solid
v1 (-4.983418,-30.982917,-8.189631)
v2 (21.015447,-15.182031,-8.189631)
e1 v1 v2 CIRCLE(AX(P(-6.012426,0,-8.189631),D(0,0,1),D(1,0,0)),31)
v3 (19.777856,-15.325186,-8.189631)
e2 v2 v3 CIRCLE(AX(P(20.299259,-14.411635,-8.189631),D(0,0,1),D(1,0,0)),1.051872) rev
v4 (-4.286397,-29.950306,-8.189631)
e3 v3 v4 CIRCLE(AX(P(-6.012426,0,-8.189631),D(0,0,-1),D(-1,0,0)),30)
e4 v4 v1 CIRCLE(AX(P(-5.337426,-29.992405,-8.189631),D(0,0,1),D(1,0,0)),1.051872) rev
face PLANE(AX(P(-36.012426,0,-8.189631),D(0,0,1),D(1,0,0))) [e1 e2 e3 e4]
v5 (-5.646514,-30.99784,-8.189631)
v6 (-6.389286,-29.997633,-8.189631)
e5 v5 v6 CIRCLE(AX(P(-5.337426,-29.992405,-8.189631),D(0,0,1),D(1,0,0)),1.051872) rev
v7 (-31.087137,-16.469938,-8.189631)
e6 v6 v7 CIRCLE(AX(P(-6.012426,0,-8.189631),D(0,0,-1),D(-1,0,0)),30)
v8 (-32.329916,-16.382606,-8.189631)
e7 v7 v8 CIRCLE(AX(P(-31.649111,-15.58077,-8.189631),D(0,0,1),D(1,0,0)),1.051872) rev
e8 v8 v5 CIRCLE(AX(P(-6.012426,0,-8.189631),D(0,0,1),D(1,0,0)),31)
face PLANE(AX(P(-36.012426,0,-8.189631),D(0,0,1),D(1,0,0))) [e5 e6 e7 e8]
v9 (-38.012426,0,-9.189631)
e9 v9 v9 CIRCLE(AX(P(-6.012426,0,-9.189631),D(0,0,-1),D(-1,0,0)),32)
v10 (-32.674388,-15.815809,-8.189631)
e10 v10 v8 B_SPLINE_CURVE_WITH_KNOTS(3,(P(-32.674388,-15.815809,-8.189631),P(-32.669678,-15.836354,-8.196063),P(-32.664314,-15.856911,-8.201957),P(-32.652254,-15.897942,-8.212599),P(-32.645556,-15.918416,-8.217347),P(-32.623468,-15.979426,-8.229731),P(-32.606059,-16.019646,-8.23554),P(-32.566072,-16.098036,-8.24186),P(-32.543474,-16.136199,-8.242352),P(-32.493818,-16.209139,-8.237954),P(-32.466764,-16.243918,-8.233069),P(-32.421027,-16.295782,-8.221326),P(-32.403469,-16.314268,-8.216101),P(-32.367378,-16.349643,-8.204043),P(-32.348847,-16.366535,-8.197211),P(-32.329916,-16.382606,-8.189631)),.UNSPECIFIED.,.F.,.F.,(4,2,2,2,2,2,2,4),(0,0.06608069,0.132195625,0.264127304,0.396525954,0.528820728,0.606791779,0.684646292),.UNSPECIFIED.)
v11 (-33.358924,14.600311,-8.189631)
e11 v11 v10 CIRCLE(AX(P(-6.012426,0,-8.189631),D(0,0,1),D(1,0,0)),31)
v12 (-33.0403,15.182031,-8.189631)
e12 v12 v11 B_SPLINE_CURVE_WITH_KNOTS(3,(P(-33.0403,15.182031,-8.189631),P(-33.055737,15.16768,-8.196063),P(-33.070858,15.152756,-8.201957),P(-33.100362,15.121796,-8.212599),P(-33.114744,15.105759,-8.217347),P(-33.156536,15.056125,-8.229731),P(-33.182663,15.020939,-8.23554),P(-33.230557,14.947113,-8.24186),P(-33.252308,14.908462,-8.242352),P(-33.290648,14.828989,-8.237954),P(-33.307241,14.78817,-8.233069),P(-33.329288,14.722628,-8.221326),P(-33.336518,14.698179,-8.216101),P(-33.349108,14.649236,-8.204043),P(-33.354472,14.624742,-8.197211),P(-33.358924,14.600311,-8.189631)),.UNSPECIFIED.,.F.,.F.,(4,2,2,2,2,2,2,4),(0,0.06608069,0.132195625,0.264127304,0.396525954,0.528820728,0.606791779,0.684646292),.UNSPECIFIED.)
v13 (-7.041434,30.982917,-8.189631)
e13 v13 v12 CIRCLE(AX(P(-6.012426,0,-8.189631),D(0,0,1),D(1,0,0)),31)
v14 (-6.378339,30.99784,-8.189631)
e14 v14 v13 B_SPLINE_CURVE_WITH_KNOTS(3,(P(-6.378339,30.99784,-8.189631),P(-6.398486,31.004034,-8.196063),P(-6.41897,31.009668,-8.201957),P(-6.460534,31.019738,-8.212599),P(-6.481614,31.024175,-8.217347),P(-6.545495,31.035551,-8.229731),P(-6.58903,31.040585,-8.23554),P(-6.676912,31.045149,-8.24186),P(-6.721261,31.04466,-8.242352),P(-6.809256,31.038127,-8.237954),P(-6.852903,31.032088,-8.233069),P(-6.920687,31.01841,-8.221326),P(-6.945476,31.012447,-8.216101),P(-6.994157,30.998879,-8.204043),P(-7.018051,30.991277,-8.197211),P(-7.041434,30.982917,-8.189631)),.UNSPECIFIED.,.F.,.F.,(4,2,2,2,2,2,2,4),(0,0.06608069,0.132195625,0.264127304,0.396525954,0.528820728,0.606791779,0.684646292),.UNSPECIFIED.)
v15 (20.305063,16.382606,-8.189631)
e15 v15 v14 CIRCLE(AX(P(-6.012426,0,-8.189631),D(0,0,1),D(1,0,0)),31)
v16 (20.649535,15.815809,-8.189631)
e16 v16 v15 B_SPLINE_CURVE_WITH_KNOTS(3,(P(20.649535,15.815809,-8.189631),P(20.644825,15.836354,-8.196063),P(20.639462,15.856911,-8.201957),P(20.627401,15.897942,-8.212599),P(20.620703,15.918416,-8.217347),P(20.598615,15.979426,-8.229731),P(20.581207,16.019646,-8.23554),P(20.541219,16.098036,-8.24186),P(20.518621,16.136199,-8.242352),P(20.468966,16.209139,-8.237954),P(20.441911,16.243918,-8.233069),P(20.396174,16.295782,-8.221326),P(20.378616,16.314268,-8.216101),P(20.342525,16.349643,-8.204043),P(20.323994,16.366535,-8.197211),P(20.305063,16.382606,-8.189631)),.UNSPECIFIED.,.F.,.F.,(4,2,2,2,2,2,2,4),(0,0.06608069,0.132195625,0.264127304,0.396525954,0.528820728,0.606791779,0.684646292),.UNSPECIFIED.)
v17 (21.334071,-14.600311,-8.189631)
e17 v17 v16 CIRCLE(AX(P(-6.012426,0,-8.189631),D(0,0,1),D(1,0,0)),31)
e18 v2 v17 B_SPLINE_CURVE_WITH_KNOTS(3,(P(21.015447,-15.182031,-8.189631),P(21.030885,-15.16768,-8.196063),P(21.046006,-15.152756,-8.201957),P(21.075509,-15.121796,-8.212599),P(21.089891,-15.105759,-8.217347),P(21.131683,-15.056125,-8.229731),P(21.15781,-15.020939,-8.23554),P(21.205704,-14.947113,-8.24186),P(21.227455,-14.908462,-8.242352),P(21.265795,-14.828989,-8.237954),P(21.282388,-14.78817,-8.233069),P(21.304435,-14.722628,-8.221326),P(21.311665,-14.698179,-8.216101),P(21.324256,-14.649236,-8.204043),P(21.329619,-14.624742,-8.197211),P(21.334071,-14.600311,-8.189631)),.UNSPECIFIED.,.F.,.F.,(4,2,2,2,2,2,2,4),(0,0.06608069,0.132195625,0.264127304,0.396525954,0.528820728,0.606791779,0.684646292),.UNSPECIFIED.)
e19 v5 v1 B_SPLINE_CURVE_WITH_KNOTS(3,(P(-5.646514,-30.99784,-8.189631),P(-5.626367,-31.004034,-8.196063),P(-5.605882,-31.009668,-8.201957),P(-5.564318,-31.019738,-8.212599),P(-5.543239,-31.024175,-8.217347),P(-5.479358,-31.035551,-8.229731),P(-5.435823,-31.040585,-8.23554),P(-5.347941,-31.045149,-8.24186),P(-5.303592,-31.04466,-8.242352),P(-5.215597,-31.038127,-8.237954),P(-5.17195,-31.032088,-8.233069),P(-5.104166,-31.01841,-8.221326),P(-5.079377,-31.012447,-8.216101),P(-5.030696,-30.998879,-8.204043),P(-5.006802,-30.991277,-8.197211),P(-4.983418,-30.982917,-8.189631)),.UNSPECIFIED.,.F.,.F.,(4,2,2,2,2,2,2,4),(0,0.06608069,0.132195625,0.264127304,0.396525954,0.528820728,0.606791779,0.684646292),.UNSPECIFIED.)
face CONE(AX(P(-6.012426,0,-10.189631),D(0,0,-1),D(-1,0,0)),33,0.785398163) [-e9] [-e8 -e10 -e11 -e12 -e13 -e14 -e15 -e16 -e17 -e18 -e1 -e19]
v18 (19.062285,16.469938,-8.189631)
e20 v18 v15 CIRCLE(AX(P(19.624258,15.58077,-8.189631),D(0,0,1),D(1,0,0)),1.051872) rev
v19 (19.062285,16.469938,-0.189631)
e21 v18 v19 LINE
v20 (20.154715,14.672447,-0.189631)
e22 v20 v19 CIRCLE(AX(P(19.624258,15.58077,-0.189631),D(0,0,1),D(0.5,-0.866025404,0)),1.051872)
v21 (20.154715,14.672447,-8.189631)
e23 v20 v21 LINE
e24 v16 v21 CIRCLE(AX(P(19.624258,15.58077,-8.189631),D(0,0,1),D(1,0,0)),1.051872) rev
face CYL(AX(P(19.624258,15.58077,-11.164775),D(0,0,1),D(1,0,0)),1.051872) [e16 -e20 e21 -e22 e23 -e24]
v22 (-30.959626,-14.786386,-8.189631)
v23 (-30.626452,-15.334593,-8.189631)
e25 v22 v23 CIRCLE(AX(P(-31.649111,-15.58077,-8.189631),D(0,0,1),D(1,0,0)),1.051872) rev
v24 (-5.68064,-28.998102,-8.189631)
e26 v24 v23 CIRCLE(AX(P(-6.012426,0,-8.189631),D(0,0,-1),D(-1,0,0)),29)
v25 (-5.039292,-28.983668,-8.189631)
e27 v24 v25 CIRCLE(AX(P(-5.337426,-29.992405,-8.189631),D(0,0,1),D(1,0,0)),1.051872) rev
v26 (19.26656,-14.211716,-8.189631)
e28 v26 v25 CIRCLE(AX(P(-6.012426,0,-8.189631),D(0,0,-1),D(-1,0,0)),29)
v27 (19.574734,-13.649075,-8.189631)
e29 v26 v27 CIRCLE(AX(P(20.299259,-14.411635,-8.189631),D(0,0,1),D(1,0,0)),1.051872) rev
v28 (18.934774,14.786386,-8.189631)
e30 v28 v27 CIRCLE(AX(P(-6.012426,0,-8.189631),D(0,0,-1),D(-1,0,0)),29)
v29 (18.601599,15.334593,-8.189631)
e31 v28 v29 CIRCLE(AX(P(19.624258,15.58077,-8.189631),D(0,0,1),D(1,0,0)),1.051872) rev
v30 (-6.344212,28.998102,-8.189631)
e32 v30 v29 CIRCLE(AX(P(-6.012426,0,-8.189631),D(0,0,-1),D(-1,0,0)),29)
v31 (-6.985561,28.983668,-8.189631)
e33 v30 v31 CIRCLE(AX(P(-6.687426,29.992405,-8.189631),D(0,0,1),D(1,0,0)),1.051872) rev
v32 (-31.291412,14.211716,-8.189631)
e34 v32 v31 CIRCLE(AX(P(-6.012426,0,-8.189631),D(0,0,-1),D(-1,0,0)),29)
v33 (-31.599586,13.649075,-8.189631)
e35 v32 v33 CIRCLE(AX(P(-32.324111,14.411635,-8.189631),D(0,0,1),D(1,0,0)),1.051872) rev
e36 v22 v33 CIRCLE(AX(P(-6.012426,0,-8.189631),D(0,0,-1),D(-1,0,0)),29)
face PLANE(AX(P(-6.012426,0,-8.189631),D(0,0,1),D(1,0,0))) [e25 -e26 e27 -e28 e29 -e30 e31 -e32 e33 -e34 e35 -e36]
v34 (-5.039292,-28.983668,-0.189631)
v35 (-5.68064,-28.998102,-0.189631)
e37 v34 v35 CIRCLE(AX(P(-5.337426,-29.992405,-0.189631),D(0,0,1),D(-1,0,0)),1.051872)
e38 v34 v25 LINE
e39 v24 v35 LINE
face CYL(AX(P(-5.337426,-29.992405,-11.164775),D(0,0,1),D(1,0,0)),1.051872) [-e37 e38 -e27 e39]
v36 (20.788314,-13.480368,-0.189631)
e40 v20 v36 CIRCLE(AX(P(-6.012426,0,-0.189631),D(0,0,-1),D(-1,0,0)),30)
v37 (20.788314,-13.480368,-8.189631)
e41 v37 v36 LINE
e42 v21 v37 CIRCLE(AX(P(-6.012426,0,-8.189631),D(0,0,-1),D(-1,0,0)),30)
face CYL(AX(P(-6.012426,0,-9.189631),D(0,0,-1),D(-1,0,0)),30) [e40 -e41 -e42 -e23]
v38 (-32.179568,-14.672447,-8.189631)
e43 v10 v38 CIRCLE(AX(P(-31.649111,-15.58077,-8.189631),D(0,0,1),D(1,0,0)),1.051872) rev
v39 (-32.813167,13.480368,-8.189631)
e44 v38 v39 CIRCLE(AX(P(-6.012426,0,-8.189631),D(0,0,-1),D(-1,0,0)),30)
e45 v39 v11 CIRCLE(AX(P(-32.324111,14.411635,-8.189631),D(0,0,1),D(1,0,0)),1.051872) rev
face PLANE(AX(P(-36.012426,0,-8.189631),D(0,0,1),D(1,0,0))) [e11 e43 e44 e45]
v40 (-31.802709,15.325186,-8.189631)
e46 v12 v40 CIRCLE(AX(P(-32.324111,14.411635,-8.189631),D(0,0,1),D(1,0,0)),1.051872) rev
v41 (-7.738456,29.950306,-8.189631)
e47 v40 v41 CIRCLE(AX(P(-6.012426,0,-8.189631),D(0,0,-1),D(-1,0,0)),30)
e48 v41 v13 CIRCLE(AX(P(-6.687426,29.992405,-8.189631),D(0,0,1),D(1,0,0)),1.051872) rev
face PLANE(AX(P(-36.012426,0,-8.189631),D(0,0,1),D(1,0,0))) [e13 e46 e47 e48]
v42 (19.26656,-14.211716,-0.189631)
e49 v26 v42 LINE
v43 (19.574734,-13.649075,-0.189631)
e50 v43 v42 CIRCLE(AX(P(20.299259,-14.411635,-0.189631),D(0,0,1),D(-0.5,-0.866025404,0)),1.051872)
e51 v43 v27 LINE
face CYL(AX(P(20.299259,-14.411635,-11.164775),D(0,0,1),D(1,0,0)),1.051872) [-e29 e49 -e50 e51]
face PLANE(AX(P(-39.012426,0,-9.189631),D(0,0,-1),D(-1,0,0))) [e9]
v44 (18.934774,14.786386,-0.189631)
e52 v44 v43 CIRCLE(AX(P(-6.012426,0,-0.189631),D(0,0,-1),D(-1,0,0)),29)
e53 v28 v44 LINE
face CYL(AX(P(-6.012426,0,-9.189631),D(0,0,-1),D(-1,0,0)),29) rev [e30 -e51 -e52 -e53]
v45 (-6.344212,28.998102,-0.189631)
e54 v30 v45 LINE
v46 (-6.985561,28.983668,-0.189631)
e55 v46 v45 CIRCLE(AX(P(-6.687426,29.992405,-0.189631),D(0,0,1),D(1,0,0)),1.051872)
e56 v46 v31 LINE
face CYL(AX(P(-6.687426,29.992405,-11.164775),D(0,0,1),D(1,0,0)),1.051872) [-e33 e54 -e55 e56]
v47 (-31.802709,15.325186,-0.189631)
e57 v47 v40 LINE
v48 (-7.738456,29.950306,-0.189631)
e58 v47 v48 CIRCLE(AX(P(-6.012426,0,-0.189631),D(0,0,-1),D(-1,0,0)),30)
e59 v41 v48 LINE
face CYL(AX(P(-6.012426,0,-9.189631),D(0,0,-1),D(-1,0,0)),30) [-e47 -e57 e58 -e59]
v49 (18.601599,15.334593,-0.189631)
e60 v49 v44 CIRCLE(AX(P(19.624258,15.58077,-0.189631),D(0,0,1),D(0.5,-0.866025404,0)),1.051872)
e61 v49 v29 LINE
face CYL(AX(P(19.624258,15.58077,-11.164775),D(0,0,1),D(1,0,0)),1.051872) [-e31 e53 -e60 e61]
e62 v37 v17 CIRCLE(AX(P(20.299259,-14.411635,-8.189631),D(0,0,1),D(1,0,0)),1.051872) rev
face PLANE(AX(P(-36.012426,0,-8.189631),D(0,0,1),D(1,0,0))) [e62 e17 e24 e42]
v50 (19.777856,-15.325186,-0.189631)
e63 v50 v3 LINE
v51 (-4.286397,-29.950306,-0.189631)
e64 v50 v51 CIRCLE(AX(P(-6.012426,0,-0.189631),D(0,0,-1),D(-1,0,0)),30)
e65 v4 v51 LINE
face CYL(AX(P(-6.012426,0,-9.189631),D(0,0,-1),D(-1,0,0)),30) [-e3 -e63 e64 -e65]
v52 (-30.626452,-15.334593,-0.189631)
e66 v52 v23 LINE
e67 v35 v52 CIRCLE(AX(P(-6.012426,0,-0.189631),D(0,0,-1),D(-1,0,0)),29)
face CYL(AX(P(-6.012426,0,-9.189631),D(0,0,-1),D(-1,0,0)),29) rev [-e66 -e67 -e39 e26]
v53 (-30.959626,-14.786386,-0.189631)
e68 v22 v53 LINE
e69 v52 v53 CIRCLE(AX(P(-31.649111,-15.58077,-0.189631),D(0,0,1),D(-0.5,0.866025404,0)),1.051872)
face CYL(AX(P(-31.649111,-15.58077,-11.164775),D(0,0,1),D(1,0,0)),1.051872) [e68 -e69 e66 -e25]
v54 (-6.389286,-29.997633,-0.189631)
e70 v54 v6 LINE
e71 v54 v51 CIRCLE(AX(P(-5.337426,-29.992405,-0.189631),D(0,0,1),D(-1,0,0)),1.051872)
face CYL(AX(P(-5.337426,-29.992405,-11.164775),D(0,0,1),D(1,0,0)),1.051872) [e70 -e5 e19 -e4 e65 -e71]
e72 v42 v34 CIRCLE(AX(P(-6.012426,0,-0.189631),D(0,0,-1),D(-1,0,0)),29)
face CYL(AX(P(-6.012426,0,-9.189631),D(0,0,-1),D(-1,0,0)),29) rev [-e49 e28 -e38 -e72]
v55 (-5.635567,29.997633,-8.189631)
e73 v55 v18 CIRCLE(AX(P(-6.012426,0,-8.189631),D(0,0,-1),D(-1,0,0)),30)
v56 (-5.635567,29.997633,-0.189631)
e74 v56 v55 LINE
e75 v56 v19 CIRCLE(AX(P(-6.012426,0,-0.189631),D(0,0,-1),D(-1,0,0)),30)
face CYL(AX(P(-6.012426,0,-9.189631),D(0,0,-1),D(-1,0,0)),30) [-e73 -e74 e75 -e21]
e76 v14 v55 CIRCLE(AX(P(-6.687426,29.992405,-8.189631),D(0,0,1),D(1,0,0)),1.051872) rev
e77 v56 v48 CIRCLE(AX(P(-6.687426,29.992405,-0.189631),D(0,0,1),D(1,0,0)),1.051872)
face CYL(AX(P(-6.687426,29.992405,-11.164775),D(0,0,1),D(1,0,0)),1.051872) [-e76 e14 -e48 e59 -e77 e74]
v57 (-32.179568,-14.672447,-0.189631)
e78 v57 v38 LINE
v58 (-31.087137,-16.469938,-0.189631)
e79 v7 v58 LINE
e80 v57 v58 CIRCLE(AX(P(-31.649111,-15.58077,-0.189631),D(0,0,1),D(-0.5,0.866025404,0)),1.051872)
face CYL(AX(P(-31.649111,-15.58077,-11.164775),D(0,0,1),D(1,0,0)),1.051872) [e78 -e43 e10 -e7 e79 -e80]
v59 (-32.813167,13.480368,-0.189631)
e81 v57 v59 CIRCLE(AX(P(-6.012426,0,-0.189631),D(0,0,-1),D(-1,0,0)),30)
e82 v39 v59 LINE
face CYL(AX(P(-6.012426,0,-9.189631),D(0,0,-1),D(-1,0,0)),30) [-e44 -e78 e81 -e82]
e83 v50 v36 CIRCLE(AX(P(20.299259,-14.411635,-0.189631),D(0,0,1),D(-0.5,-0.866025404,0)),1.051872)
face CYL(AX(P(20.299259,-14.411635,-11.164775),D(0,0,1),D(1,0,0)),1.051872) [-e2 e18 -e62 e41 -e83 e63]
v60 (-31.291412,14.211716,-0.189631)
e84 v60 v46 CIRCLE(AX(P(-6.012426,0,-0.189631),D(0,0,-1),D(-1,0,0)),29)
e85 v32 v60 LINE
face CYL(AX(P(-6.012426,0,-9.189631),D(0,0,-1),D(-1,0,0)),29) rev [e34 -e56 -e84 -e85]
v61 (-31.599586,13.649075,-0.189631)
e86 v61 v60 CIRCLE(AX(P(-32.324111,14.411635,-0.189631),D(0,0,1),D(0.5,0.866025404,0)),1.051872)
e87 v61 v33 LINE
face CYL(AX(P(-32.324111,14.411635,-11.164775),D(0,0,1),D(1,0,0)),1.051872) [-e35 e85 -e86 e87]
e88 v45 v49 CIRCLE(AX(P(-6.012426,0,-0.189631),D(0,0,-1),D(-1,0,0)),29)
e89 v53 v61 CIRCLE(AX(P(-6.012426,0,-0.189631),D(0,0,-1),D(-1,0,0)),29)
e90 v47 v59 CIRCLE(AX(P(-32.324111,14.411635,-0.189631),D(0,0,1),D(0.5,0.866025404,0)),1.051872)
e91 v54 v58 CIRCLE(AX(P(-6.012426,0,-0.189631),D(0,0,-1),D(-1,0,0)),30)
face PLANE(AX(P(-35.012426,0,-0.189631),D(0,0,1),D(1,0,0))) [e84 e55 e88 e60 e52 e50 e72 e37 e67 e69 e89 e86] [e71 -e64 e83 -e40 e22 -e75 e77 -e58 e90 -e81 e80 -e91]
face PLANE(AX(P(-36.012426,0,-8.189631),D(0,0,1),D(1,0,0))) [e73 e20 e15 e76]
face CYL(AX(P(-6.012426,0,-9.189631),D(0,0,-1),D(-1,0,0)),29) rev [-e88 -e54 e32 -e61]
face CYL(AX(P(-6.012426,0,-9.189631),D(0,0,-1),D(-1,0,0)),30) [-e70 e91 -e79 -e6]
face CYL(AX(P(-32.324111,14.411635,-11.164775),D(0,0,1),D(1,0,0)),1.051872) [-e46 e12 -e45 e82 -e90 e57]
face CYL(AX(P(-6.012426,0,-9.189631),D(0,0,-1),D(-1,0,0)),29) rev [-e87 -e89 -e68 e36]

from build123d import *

# Parameters (mm, degrees)
SKETCH_2_R               = 1.051872146
EXTRUDE_1_DEPTH          = 8
PATTERN_CIRCULAR_1_COUNT = 6
CHAMFER_1_SIZE           = 2


with BuildPart() as part:
    # Эскиз1 → Повернуть1 (revolve)
    with BuildSketch(Plane(origin=(0, 0, 0), x_dir=(1, 0, 0), z_dir=(0, 1, 0))):
        Polygon((-39.012426389, 8.189631494), (-39.012426389, 9.189631494), (-6.012426389, 9.189631494), (-6.012426389, 8.189631494), (-35.012426389, 8.189631494), (-35.012426389, 0.189631494), (-36.012426389, 0.189631494), (-36.012426389, 8.189631494), align=None)
    revolve(axis=Axis((-6.012426389, 0, -9.189631494), (0, 0, 1)))

    # Эскиз2 → Бобышка-Вытянуть1 (add)
    with BuildSketch(Plane.XY.offset(-0.189631494)):
        with Locations((-6.68742643, 29.992405288)):
            Circle(SKETCH_2_R)
    extrude_1 = extrude(amount=-EXTRUDE_1_DEPTH)

    # Круговой массив1: Бобышка-Вытянуть1 ×6 about axis
    pattern_circular_1_axis = Axis((-6.012426389, 0, 0), (0, 0, 1))
    for i in range(1, PATTERN_CIRCULAR_1_COUNT):
        add(extrude_1.rotate(pattern_circular_1_axis, i * 360 / PATTERN_CIRCULAR_1_COUNT))

    # Фаска1
    # the kernel refuses this chamfer: 2 mm, written as the material it takes off along each edge
    with BuildSketch(Plane(origin=(-6.012426389, 0, -8.189631494), x_dir=(-1, 0, 0), z_dir=(0, 1, 0))) as chamfer_1_piece_1_section:
        Polygon((33, -CHAMFER_1_SIZE), (33 - CHAMFER_1_SIZE, 0), (33, 0), align=None)
    chamfer_1_piece_1 = revolve(axis=Axis((-6.012426389, 0, -8.189631494), (0, 0, 1)), mode=Mode.PRIVATE)
    chamfer_1_piece_1 = chamfer_1_piece_1 - Plane(origin=(19.62425849, 15.580769827, -9.135558261), x_dir=(0.5000000000000001, -0.8660254037844386, 0), z_dir=(0, 0, 1)) * Cylinder(1.051872146, 132, mode=Mode.PRIVATE)
    chamfer_1_piece_1 = chamfer_1_piece_1 - Plane(origin=(20.299258531, -14.411635461, -9.135558261), x_dir=(-0.5000000000000004, -0.8660254037844384, 0), z_dir=(0, 0, 1)) * Cylinder(1.051872146, 132, mode=Mode.PRIVATE)
    chamfer_1_piece_1 = chamfer_1_piece_1 - Plane(origin=(-5.337426348, -29.992405288, -9.135558261), x_dir=(-1, 0, 0), z_dir=(0, 0, 1)) * Cylinder(1.051872146, 132, mode=Mode.PRIVATE)
    chamfer_1_piece_1 = chamfer_1_piece_1 - Plane(origin=(-31.649111268, -15.580769827, -9.135558261), x_dir=(-0.49999999999999983, 0.8660254037844388, 0), z_dir=(0, 0, 1)) * Cylinder(1.051872146, 132, mode=Mode.PRIVATE)
    chamfer_1_piece_1 = chamfer_1_piece_1 - Plane(origin=(-32.324111309, 14.411635461, -9.135558261), x_dir=(0.5000000000000001, 0.8660254037844386, 0), z_dir=(0, 0, 1)) * Cylinder(1.051872146, 132, mode=Mode.PRIVATE)
    chamfer_1_piece_1 = chamfer_1_piece_1 - Plane(origin=(-6.68742643, 29.992405288, -9.135558261), x_dir=(1, 0, 0), z_dir=(0, 0, 1)) * Cylinder(1.051872146, 132, mode=Mode.PRIVATE)
    add(chamfer_1_piece_1, mode=Mode.SUBTRACT)


solid = part.part
